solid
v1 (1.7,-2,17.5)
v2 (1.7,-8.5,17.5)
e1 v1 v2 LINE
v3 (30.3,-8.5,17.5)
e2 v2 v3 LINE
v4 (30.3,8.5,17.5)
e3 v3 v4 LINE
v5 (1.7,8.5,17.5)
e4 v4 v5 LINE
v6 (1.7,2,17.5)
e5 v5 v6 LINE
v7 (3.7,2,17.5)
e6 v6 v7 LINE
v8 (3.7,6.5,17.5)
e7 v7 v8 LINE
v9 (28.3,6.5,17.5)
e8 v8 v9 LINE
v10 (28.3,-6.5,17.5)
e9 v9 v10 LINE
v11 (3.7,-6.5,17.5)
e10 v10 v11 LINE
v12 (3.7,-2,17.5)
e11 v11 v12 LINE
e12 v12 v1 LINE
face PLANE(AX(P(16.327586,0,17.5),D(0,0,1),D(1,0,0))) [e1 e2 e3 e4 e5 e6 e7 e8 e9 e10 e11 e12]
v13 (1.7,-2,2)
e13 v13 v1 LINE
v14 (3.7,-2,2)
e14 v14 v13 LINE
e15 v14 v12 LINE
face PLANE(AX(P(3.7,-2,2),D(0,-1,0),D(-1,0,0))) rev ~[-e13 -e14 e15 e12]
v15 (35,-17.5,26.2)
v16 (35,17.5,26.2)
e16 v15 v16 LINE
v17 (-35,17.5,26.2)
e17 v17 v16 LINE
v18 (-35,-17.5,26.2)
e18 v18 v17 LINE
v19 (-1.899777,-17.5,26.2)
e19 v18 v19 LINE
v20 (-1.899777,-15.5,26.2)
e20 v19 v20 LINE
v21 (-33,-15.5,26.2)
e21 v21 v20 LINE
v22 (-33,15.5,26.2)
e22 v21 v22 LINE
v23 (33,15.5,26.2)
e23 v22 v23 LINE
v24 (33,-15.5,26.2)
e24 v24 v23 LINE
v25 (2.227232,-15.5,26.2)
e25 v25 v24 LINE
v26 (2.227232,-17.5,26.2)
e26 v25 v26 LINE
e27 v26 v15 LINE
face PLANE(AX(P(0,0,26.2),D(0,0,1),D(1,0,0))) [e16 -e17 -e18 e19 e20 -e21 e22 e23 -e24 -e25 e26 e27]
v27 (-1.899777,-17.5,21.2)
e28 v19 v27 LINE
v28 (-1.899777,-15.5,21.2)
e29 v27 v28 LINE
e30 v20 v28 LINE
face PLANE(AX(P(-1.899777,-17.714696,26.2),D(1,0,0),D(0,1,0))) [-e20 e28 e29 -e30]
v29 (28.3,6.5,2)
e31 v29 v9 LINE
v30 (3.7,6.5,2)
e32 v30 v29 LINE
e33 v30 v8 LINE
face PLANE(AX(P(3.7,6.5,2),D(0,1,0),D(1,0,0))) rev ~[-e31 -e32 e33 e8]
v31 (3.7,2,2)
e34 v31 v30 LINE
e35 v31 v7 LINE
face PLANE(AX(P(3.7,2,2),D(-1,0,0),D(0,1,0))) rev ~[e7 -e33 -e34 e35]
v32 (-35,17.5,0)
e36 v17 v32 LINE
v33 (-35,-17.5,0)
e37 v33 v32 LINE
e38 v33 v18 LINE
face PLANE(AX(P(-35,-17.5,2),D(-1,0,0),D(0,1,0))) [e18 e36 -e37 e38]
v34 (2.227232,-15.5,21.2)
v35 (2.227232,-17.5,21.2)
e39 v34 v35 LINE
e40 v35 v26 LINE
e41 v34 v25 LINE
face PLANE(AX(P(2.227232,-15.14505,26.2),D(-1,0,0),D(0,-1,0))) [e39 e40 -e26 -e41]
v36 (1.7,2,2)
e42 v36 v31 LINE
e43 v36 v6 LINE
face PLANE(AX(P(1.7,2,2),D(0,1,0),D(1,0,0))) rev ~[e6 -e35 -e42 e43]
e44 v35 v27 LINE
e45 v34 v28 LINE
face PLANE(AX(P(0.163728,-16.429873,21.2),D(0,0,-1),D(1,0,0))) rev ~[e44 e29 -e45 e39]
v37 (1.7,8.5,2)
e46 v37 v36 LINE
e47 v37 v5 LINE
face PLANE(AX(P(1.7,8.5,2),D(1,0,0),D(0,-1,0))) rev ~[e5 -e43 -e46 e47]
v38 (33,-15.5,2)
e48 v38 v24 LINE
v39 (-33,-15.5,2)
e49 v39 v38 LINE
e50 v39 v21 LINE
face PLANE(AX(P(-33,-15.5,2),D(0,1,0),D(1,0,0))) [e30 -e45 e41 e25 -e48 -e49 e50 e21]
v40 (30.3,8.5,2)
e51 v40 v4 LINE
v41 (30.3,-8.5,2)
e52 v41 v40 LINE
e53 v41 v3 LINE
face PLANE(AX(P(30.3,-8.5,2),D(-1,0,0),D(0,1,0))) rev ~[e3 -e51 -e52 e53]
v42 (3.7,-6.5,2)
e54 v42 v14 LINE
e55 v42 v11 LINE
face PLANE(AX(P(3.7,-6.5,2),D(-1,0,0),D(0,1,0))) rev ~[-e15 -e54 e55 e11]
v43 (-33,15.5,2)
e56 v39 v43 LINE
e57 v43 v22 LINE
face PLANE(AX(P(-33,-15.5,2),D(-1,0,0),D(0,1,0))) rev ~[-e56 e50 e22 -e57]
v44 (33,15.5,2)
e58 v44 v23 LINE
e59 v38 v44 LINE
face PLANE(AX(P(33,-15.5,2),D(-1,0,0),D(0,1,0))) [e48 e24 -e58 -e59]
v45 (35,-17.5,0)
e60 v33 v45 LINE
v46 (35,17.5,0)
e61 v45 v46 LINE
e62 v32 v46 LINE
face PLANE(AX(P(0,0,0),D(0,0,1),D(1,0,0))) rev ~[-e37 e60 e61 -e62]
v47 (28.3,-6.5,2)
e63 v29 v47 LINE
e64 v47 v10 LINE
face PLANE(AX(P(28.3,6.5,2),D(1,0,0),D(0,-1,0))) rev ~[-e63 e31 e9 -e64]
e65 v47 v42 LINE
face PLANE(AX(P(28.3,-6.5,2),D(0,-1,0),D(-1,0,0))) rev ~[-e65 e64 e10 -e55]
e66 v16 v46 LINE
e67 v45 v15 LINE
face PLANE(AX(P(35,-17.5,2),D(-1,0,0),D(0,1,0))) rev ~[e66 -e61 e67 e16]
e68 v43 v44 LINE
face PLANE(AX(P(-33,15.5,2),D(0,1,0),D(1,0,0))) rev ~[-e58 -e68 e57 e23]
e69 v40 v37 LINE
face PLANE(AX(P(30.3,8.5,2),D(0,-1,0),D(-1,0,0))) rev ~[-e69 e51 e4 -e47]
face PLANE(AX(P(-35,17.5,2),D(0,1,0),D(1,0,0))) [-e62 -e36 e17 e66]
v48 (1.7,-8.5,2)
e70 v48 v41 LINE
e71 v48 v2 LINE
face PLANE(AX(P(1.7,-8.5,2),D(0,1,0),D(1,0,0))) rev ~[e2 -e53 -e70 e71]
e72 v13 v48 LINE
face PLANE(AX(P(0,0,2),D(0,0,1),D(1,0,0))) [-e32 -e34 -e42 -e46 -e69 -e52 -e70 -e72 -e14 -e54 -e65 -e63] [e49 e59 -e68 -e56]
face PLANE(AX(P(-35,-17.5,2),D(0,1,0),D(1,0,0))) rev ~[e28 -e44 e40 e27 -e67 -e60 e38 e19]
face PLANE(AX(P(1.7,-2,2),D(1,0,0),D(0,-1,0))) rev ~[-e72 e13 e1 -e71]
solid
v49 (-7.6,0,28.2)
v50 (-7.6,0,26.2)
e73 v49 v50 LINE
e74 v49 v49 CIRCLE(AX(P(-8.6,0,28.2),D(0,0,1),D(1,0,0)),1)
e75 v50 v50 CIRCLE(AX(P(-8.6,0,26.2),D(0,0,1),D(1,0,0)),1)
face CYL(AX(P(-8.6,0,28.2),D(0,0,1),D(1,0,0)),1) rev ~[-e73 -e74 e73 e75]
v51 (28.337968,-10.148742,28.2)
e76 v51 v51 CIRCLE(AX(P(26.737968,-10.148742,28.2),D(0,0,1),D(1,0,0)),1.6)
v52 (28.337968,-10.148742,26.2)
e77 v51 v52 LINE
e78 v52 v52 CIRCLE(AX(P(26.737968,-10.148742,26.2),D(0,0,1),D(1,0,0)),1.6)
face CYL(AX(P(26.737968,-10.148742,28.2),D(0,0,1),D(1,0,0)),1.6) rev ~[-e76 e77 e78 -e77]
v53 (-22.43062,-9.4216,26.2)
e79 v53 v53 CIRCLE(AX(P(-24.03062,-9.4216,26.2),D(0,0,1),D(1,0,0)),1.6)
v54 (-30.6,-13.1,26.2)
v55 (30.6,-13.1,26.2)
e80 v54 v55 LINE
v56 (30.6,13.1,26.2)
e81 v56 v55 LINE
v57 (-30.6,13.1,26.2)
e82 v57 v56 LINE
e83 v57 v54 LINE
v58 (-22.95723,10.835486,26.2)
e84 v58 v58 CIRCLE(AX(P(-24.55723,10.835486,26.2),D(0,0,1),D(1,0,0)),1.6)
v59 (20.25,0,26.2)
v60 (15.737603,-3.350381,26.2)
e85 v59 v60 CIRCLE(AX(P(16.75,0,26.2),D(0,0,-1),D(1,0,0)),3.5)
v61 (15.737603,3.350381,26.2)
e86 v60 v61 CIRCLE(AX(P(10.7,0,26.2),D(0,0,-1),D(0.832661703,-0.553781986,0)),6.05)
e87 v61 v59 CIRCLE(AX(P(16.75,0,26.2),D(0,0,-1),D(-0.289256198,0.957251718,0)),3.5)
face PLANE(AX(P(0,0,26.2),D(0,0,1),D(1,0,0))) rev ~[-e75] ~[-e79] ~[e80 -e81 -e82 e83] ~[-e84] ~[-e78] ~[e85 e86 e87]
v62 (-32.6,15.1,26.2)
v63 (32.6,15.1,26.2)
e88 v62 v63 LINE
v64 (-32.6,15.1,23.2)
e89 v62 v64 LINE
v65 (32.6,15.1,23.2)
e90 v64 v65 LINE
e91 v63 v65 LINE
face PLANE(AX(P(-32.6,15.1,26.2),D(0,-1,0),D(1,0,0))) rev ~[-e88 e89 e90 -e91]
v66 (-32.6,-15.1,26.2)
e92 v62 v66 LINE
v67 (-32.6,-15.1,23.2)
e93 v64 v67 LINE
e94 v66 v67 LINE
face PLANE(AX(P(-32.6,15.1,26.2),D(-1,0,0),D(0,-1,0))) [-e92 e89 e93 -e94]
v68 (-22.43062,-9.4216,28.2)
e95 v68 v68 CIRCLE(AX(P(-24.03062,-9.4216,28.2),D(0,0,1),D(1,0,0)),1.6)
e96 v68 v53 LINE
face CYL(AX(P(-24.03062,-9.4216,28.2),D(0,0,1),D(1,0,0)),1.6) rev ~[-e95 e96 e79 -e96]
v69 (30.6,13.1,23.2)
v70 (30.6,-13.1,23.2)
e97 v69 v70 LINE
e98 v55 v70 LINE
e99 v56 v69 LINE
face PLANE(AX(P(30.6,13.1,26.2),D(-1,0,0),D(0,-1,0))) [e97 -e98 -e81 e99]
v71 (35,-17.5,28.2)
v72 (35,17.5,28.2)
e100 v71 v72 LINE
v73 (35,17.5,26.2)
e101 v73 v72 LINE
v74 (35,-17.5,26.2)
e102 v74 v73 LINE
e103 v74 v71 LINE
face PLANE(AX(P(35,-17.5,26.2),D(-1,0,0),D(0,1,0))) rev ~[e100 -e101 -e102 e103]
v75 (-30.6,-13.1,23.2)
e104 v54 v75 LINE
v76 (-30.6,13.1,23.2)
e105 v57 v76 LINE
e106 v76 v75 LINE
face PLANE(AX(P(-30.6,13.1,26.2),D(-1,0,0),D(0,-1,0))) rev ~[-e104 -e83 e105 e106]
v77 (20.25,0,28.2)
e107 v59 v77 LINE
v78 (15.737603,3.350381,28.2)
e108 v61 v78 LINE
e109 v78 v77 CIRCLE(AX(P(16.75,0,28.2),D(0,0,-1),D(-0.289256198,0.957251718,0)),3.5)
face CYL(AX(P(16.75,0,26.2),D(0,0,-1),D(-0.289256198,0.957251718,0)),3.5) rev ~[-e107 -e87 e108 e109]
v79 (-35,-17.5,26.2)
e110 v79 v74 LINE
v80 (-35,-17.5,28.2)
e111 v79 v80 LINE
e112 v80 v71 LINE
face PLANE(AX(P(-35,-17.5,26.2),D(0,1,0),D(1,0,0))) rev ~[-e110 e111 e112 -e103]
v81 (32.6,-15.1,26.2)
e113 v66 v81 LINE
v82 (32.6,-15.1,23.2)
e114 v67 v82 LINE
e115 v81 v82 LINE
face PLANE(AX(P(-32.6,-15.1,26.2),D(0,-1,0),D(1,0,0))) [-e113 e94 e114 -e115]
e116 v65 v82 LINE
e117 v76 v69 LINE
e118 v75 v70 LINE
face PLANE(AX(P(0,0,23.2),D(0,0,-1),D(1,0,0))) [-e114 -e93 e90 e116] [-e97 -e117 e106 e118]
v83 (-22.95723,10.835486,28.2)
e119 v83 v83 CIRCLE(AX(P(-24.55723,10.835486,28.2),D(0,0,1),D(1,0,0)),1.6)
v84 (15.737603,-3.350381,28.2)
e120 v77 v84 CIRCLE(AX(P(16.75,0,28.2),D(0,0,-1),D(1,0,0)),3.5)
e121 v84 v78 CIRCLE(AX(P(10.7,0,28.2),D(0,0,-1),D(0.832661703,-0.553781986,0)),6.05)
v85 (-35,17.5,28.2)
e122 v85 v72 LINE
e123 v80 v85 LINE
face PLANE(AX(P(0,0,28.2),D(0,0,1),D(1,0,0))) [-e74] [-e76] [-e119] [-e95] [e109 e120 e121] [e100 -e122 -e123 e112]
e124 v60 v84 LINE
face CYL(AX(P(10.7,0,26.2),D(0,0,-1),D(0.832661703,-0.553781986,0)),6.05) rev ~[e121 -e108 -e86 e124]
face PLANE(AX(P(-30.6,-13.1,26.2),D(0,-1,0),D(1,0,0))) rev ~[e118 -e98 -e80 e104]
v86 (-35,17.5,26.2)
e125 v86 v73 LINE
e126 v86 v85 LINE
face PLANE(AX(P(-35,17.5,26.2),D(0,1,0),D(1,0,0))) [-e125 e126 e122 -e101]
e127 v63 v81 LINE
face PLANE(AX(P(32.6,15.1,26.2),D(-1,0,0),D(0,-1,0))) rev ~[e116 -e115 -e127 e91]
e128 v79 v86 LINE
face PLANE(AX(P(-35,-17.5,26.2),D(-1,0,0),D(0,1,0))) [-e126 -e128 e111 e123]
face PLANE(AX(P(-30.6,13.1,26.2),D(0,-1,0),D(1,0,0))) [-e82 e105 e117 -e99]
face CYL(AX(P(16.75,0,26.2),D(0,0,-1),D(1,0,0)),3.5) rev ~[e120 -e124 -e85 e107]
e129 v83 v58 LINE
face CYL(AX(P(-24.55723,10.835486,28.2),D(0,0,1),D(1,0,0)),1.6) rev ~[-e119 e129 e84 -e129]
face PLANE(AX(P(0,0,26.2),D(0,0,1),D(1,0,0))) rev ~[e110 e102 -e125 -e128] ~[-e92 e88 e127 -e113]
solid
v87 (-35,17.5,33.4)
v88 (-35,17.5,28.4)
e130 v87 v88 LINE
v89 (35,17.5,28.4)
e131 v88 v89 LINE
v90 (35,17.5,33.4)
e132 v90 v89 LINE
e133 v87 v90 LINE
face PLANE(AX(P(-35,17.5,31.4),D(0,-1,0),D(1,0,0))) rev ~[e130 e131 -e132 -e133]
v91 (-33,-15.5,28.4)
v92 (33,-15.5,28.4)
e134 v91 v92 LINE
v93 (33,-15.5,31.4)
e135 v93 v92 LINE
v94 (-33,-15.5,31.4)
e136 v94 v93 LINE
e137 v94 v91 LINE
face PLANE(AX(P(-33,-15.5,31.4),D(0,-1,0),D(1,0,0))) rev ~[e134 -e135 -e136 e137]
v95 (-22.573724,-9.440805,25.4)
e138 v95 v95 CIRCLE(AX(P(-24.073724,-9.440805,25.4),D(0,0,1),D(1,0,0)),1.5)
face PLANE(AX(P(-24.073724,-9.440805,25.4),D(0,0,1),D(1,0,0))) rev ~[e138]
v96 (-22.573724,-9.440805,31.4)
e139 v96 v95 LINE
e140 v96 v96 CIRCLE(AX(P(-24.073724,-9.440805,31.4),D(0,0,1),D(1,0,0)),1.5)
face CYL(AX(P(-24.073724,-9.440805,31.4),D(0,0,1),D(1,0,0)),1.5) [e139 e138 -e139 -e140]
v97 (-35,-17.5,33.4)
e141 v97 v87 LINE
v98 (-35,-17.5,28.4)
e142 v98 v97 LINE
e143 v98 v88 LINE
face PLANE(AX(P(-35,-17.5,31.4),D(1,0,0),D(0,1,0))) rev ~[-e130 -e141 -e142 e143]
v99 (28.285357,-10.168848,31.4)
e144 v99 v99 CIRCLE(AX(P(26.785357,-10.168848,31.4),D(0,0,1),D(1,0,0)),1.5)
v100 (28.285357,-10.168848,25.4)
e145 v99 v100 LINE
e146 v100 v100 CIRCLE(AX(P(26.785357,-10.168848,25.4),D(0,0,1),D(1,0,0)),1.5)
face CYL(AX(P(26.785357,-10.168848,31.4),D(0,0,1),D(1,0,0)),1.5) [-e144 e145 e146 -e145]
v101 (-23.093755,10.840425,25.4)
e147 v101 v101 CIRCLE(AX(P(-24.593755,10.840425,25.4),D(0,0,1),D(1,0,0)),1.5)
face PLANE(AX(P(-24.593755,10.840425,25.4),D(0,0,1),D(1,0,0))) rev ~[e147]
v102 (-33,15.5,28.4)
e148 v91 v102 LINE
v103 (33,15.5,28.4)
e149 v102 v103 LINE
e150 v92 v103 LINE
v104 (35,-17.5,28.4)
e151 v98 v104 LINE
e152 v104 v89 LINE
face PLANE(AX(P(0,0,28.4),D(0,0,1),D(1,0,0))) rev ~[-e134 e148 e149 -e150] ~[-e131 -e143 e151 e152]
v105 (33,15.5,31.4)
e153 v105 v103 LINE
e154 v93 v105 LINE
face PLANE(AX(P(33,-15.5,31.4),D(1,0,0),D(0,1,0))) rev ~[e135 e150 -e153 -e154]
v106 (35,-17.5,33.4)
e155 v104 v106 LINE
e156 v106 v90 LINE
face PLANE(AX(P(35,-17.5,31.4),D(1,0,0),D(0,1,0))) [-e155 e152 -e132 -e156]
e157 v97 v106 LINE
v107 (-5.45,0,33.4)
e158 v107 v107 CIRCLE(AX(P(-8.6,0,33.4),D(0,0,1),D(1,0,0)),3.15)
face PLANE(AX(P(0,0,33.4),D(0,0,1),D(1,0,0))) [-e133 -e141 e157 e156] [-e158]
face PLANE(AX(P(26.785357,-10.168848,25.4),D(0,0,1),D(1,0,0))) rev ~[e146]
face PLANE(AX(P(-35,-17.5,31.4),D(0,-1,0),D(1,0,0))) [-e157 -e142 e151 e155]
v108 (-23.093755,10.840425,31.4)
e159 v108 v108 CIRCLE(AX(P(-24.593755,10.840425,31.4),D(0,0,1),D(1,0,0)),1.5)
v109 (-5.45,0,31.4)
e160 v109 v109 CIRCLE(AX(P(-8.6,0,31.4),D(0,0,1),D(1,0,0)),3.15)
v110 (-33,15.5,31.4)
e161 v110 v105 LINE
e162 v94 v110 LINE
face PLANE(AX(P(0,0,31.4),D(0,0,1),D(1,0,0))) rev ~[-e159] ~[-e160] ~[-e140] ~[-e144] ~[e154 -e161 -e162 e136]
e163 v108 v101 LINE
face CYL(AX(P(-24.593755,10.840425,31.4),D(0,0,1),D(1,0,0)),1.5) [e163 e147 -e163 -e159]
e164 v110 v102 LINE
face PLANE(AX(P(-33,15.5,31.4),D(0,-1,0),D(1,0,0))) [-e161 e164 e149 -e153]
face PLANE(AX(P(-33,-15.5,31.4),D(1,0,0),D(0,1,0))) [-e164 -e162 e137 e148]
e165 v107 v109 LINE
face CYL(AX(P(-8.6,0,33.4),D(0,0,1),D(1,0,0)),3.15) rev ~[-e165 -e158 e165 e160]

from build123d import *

# Parameters (mm, degrees)
F0_W      = 70
F0_H      = 35
F1_DEPTH  = 2
F2_W      = 70
F2_H      = 35
F2_W_2    = 66
F2_H_2    = 31
F3_DEPTH  = 24.2
F5_DEPTH  = 15.5
F6_W      = 70
F6_H      = 35
F7_DEPTH  = 2
F8_W      = 65.2
F8_H      = 30.2
F8_W_2    = 61.2
F8_H_2    = 26.2
F9_DEPTH  = 3
F11_DEPTH = 25
F13_DEPTH = 5
F14_R     = 1
F15_DEPTH = 3
F17_W     = 70
F17_H     = 35
F18_DEPTH = 2
F19_W     = 70
F19_H     = 35
F19_W_2   = 66
F19_H_2   = 31
F20_DEPTH = 3
F21_R     = 3.15
F22_DEPTH = 2
F23_R     = 1.5
F24_DEPTH = 6
F25_R     = 1.6
F26_DEPTH = 2


with BuildPart() as f1:
    # F0 (on Top) → F1 (new body)
    with BuildSketch(Plane.XY):
        Rectangle(F0_W, F0_H)
    extrude(amount=F1_DEPTH)

    # F2 (on face) → F3 (join)
    with BuildSketch(Plane.XY.offset(2)):
        Rectangle(F2_W, F2_H)
        Rectangle(F2_W_2, F2_H_2, mode=Mode.SUBTRACT)
    extrude(amount=F3_DEPTH)

    # F4 (on face) → F5 (join)
    with BuildSketch(Plane.XY.offset(2)):
        Polygon((3.7, 6.5), (28.3, 6.5), (28.3, -6.5), (3.7, -6.5), (3.7, -2), (1.7, -2), (1.7, -8.5), (30.3, -8.5), (30.3, 8.5), (1.7, 8.5), (1.7, 2), (3.7, 2), align=None)
    extrude(amount=F5_DEPTH)

    # F12 (on face) → F13 (cut)
    with BuildSketch(Plane(origin=(0, 0, 26.2), x_dir=(1, 0, 0), z_dir=(0, 0, -1))):
        Polygon((-1.899776631, 17.714696005), (-1.899776631, 15.3786540031), (-1.899776631, 15.1450503618), (2.227232093, 15.1450503618), (2.227232093, 17.714696005), align=None)
    extrude(amount=F13_DEPTH, mode=Mode.SUBTRACT)


with BuildPart() as f7:
    # F6 (on face) → F7 (new body)
    with BuildSketch(Plane.XY.offset(26.2)):
        Rectangle(F6_W, F6_H)
    extrude(amount=F7_DEPTH)

    # F8 (on face) → F9 (join)
    with BuildSketch(Plane(origin=(0, 0, 26.2), x_dir=(1, 0, 0), z_dir=(0, 0, -1))):
        Rectangle(F8_W, F8_H)
        Rectangle(F8_W_2, F8_H_2, mode=Mode.SUBTRACT)
    extrude(amount=F9_DEPTH)

    # F10 (on face) → F11 (cut)
    with BuildSketch(Plane(origin=(0, 0, 26.2), x_dir=(1, 0, 0), z_dir=(0, 0, -1))):
        with BuildLine():
            ThreePointArc((15.7376033058, -3.3503810132), (16.4913728942, -1.75), (16.75, 0))
            ThreePointArc((16.75, 0), (16.4913728942, 1.75), (15.7376033058, 3.3503810132))
            ThreePointArc((15.7376033058, 3.3503810132), (13.25, 0), (15.7376033058, -3.3503810132))
        make_face()
        with BuildLine():
            ThreePointArc((15.7376033058, 3.3503810132), (16.4913728942, 1.75), (16.75, 0))
            ThreePointArc((16.75, 0), (16.4913728942, -1.75), (15.7376033058, -3.3503810132))
            ThreePointArc((15.7376033058, -3.3503810132), (18.8364577123, -2.8101057302), (20.25, 0))
            ThreePointArc((20.25, 0), (18.8364577123, 2.8101057302), (15.7376033058, 3.3503810132))
        make_face()
        with BuildLine():
            ThreePointArc((15.7376033058, -3.3503810132), (13.25, 0), (15.7376033058, 3.3503810132))
            ThreePointArc((15.7376033058, 3.3503810132), (4.65, 0), (15.7376033058, -3.3503810132))
        make_face()
    extrude(amount=-F11_DEPTH, mode=Mode.SUBTRACT)

    # F14 (on face) → F15 (cut)
    with BuildSketch(Plane.XY.offset(28.2)):
        with Locations((-8.6, 0)):
            Circle(F14_R)
    extrude(amount=-F15_DEPTH, mode=Mode.SUBTRACT)

    # F25 (on face) → F26 (cut)
    with BuildSketch(Plane.XY.offset(28.2)):
        with Locations((-24.5572296758, 10.8354858681)):
            Circle(F25_R)
        with Locations((-24.0306204174, -9.4215996393)):
            Circle(F25_R)
        with Locations((26.737968057, -10.1487416467)):
            Circle(F25_R)
    extrude(amount=-F26_DEPTH, mode=Mode.SUBTRACT)


with BuildPart() as f18:
    # F17 (on offset) → F18 (new body)
    with BuildSketch(Plane.XY.offset(31.4)):
        Rectangle(F17_W, F17_H)
    extrude(amount=F18_DEPTH)

    # F19 (on offset) → F20 (join)
    with BuildSketch(Plane.XY.offset(31.4)):
        Rectangle(F19_W, F19_H)
        Rectangle(F19_W_2, F19_H_2, mode=Mode.SUBTRACT)
    extrude(amount=-F20_DEPTH)

    # F21 (on face) → F22 (cut)
    with BuildSketch(Plane.XY.offset(33.4)):
        with Locations((-8.6, 0)):
            Circle(F21_R)
    extrude(amount=-F22_DEPTH, mode=Mode.SUBTRACT)

    # F23 (on offset) → F24 (join)
    with BuildSketch(Plane.XY.offset(31.4)):
        with Locations((-24.5937554311, 10.8404249086)):
            Circle(F23_R)
        with Locations((-24.0737235235, -9.4408045343)):
            Circle(F23_R)
        with Locations((26.7853572811, -10.1688477976)):
            Circle(F23_R)
    extrude(amount=-F24_DEPTH)


solid = Compound([f1.part, f7.part, f18.part])
